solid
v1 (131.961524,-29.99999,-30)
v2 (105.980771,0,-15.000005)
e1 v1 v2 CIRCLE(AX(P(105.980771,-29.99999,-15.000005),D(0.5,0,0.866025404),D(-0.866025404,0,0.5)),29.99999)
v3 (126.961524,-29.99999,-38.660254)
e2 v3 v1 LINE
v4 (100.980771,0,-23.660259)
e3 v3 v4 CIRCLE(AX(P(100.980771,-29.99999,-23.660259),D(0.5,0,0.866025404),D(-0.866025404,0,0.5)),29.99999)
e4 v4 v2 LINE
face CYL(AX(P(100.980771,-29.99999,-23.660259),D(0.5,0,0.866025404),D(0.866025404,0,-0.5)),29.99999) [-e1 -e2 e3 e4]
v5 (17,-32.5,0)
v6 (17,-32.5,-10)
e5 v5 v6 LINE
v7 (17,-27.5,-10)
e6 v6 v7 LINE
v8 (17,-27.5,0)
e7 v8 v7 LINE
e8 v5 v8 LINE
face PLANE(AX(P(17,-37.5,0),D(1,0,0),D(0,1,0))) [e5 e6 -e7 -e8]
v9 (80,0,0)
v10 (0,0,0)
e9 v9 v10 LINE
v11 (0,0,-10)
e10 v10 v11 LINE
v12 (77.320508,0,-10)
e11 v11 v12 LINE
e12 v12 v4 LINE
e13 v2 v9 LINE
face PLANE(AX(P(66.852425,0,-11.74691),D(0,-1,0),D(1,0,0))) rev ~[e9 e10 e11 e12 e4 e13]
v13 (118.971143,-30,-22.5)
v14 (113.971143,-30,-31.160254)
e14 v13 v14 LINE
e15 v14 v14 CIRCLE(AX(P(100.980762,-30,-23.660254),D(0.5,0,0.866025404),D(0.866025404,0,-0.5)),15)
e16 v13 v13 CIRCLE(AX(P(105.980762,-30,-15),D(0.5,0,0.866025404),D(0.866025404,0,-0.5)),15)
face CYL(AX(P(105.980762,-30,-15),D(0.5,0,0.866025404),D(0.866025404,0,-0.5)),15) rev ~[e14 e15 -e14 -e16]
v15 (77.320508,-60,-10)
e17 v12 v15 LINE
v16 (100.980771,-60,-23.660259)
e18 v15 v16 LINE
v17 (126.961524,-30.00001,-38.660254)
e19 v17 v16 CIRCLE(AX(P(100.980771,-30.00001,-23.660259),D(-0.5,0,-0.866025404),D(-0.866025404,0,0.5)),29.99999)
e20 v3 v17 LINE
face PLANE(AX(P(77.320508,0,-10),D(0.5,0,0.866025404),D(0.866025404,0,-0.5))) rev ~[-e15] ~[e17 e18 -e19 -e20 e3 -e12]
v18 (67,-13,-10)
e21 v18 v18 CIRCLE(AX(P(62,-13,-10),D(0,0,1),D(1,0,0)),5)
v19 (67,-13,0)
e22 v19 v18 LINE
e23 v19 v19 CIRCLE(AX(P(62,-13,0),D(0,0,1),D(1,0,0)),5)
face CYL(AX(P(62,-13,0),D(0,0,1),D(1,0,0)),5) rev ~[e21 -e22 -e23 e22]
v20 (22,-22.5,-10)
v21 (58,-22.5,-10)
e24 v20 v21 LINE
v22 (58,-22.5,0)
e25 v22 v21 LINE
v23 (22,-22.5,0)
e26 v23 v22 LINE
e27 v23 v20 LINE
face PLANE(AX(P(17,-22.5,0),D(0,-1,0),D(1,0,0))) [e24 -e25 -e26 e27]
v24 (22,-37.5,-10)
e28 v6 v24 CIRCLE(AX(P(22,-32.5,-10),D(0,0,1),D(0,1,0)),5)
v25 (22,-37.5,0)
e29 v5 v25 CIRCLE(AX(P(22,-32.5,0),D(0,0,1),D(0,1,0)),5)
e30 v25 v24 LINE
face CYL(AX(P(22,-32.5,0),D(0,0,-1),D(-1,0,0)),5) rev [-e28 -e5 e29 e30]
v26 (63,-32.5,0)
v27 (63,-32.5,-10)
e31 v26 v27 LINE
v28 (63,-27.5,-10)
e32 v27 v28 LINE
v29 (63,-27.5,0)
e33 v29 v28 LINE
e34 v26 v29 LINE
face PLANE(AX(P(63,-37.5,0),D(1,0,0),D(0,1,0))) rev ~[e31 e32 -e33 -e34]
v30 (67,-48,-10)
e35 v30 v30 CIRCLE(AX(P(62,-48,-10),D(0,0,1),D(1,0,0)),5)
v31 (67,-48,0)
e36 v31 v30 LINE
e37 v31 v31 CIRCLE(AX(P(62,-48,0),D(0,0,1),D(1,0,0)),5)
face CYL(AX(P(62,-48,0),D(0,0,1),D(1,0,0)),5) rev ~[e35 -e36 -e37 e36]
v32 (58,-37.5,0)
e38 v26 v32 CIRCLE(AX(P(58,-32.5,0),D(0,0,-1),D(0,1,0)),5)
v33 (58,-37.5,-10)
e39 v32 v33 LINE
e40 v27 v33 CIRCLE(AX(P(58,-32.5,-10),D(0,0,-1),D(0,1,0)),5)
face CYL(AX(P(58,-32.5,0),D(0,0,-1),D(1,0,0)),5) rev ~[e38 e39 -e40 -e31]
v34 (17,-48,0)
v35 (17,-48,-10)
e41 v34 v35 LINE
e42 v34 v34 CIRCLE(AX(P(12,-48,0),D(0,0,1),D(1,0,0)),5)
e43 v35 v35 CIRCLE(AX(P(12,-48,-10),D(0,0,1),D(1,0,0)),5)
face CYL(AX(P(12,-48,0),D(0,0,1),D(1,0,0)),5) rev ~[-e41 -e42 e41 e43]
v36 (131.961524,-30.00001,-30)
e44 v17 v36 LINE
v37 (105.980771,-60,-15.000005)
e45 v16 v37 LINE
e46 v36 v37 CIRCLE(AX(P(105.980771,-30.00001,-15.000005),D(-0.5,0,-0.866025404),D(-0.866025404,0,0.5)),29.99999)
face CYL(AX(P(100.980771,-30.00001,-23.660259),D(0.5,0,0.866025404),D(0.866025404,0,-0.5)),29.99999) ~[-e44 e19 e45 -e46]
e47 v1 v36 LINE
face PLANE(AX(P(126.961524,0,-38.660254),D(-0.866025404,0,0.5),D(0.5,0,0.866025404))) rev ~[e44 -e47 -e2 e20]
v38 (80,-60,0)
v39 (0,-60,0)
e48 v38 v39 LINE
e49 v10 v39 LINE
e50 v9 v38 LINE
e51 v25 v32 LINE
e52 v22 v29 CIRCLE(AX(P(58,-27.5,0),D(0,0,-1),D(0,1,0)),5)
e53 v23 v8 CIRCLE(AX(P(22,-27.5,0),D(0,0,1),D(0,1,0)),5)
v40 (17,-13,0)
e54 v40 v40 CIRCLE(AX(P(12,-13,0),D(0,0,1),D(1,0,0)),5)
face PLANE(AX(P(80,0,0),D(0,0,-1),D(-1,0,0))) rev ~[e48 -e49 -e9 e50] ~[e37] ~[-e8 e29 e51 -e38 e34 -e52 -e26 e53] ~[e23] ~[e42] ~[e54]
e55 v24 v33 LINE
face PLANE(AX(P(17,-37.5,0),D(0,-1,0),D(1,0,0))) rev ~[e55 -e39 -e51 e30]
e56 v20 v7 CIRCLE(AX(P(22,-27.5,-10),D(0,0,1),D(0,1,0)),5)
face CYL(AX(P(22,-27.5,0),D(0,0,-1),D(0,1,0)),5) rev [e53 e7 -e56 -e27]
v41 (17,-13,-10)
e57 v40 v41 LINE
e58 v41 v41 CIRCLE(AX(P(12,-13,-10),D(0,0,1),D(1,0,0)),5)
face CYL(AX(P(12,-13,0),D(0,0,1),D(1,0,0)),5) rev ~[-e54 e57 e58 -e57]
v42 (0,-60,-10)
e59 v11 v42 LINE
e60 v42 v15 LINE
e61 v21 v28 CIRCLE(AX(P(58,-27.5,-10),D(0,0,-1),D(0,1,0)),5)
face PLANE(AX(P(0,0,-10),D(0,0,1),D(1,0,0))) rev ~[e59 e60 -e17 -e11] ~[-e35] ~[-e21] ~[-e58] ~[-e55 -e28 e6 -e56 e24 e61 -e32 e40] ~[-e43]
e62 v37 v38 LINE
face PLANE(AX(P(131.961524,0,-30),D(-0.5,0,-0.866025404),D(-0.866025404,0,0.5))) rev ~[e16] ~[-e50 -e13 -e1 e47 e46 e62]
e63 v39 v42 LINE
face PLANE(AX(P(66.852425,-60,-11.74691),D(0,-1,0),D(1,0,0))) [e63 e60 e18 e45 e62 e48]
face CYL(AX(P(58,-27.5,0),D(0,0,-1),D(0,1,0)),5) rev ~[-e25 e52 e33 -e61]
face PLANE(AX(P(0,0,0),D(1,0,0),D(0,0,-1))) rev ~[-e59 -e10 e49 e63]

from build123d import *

# Parameters (mm, degrees)
F1_DEPTH = 60
F2_R     = 29.99999
F3_R     = 15
F4_DEPTH = 10
F5_R     = 5
F6_DEPTH = 10
F7_W     = 46
F7_H     = 15
F8_DEPTH = 10
F9_R     = 5
F10_R    = 5


# Not quite as in the source:
# - a fillet or chamfer is up to 0.001 mm smaller than in the source, because OpenCascade refuses the exact size


with BuildPart() as f1:
    # F0 (on Front) → F1 (new body)
    with BuildSketch(Plane.XZ):
        Polygon((80, 0), (0, 0), (0, -10), (77.3205080757, -10), (126.9615242271, -38.6602540378), (131.9615242271, -30), align=None)
    extrude(amount=F1_DEPTH)

    # F2 (radius 30 in the source; OpenCascade refuses exactly that, so slightly less here)
    f2_edges = [f1.edges().sort_by_distance(p)[0] for p in [
        (129.461524, 0, -34.330127),
        (129.461524, -60, -34.330127),
    ]]
    fillet(f2_edges, radius=F2_R)

    # F3 (on face) → F4 (cut, through all)
    with BuildSketch(Plane(origin=(20, 0, 34.6410161514), x_dir=(0.8660254038, 0, -0.5), z_dir=(0.5, 0, 0.8660254038))):
        with Locations((99.2820323028, -30)):
            Circle(F3_R)
    extrude(amount=-F4_DEPTH, mode=Mode.SUBTRACT)

    # F5 (on face) → F6 (cut, through all)
    with BuildSketch(Plane.XY):
        with Locations((12, -13)):
            Circle(F5_R)
        with Locations((12, -48)):
            Circle(F5_R)
        with Locations((62, -48)):
            Circle(F5_R)
        with Locations((62, -13)):
            Circle(F5_R)
    extrude(amount=-F6_DEPTH, mode=Mode.SUBTRACT)

    # F7 (on face) → F8 (cut, through all)
    with BuildSketch(Plane.XY):
        with Locations((40, -30)):
            Rectangle(F7_W, F7_H)
    extrude(amount=-F8_DEPTH, mode=Mode.SUBTRACT)

    # F9
    f9_edges = [f1.edges().sort_by_distance(p)[0] for p in [
        (17, -22.5, -5),
    ]]
    fillet(f9_edges, radius=F9_R)

    # F10
    f10_edges = [f1.edges().sort_by_distance(p)[0] for p in [
        (63, -22.5, -5),
        (63, -37.5, -5),
        (17, -37.5, -5),
    ]]
    fillet(f10_edges, radius=F10_R)


solid = f1.part
